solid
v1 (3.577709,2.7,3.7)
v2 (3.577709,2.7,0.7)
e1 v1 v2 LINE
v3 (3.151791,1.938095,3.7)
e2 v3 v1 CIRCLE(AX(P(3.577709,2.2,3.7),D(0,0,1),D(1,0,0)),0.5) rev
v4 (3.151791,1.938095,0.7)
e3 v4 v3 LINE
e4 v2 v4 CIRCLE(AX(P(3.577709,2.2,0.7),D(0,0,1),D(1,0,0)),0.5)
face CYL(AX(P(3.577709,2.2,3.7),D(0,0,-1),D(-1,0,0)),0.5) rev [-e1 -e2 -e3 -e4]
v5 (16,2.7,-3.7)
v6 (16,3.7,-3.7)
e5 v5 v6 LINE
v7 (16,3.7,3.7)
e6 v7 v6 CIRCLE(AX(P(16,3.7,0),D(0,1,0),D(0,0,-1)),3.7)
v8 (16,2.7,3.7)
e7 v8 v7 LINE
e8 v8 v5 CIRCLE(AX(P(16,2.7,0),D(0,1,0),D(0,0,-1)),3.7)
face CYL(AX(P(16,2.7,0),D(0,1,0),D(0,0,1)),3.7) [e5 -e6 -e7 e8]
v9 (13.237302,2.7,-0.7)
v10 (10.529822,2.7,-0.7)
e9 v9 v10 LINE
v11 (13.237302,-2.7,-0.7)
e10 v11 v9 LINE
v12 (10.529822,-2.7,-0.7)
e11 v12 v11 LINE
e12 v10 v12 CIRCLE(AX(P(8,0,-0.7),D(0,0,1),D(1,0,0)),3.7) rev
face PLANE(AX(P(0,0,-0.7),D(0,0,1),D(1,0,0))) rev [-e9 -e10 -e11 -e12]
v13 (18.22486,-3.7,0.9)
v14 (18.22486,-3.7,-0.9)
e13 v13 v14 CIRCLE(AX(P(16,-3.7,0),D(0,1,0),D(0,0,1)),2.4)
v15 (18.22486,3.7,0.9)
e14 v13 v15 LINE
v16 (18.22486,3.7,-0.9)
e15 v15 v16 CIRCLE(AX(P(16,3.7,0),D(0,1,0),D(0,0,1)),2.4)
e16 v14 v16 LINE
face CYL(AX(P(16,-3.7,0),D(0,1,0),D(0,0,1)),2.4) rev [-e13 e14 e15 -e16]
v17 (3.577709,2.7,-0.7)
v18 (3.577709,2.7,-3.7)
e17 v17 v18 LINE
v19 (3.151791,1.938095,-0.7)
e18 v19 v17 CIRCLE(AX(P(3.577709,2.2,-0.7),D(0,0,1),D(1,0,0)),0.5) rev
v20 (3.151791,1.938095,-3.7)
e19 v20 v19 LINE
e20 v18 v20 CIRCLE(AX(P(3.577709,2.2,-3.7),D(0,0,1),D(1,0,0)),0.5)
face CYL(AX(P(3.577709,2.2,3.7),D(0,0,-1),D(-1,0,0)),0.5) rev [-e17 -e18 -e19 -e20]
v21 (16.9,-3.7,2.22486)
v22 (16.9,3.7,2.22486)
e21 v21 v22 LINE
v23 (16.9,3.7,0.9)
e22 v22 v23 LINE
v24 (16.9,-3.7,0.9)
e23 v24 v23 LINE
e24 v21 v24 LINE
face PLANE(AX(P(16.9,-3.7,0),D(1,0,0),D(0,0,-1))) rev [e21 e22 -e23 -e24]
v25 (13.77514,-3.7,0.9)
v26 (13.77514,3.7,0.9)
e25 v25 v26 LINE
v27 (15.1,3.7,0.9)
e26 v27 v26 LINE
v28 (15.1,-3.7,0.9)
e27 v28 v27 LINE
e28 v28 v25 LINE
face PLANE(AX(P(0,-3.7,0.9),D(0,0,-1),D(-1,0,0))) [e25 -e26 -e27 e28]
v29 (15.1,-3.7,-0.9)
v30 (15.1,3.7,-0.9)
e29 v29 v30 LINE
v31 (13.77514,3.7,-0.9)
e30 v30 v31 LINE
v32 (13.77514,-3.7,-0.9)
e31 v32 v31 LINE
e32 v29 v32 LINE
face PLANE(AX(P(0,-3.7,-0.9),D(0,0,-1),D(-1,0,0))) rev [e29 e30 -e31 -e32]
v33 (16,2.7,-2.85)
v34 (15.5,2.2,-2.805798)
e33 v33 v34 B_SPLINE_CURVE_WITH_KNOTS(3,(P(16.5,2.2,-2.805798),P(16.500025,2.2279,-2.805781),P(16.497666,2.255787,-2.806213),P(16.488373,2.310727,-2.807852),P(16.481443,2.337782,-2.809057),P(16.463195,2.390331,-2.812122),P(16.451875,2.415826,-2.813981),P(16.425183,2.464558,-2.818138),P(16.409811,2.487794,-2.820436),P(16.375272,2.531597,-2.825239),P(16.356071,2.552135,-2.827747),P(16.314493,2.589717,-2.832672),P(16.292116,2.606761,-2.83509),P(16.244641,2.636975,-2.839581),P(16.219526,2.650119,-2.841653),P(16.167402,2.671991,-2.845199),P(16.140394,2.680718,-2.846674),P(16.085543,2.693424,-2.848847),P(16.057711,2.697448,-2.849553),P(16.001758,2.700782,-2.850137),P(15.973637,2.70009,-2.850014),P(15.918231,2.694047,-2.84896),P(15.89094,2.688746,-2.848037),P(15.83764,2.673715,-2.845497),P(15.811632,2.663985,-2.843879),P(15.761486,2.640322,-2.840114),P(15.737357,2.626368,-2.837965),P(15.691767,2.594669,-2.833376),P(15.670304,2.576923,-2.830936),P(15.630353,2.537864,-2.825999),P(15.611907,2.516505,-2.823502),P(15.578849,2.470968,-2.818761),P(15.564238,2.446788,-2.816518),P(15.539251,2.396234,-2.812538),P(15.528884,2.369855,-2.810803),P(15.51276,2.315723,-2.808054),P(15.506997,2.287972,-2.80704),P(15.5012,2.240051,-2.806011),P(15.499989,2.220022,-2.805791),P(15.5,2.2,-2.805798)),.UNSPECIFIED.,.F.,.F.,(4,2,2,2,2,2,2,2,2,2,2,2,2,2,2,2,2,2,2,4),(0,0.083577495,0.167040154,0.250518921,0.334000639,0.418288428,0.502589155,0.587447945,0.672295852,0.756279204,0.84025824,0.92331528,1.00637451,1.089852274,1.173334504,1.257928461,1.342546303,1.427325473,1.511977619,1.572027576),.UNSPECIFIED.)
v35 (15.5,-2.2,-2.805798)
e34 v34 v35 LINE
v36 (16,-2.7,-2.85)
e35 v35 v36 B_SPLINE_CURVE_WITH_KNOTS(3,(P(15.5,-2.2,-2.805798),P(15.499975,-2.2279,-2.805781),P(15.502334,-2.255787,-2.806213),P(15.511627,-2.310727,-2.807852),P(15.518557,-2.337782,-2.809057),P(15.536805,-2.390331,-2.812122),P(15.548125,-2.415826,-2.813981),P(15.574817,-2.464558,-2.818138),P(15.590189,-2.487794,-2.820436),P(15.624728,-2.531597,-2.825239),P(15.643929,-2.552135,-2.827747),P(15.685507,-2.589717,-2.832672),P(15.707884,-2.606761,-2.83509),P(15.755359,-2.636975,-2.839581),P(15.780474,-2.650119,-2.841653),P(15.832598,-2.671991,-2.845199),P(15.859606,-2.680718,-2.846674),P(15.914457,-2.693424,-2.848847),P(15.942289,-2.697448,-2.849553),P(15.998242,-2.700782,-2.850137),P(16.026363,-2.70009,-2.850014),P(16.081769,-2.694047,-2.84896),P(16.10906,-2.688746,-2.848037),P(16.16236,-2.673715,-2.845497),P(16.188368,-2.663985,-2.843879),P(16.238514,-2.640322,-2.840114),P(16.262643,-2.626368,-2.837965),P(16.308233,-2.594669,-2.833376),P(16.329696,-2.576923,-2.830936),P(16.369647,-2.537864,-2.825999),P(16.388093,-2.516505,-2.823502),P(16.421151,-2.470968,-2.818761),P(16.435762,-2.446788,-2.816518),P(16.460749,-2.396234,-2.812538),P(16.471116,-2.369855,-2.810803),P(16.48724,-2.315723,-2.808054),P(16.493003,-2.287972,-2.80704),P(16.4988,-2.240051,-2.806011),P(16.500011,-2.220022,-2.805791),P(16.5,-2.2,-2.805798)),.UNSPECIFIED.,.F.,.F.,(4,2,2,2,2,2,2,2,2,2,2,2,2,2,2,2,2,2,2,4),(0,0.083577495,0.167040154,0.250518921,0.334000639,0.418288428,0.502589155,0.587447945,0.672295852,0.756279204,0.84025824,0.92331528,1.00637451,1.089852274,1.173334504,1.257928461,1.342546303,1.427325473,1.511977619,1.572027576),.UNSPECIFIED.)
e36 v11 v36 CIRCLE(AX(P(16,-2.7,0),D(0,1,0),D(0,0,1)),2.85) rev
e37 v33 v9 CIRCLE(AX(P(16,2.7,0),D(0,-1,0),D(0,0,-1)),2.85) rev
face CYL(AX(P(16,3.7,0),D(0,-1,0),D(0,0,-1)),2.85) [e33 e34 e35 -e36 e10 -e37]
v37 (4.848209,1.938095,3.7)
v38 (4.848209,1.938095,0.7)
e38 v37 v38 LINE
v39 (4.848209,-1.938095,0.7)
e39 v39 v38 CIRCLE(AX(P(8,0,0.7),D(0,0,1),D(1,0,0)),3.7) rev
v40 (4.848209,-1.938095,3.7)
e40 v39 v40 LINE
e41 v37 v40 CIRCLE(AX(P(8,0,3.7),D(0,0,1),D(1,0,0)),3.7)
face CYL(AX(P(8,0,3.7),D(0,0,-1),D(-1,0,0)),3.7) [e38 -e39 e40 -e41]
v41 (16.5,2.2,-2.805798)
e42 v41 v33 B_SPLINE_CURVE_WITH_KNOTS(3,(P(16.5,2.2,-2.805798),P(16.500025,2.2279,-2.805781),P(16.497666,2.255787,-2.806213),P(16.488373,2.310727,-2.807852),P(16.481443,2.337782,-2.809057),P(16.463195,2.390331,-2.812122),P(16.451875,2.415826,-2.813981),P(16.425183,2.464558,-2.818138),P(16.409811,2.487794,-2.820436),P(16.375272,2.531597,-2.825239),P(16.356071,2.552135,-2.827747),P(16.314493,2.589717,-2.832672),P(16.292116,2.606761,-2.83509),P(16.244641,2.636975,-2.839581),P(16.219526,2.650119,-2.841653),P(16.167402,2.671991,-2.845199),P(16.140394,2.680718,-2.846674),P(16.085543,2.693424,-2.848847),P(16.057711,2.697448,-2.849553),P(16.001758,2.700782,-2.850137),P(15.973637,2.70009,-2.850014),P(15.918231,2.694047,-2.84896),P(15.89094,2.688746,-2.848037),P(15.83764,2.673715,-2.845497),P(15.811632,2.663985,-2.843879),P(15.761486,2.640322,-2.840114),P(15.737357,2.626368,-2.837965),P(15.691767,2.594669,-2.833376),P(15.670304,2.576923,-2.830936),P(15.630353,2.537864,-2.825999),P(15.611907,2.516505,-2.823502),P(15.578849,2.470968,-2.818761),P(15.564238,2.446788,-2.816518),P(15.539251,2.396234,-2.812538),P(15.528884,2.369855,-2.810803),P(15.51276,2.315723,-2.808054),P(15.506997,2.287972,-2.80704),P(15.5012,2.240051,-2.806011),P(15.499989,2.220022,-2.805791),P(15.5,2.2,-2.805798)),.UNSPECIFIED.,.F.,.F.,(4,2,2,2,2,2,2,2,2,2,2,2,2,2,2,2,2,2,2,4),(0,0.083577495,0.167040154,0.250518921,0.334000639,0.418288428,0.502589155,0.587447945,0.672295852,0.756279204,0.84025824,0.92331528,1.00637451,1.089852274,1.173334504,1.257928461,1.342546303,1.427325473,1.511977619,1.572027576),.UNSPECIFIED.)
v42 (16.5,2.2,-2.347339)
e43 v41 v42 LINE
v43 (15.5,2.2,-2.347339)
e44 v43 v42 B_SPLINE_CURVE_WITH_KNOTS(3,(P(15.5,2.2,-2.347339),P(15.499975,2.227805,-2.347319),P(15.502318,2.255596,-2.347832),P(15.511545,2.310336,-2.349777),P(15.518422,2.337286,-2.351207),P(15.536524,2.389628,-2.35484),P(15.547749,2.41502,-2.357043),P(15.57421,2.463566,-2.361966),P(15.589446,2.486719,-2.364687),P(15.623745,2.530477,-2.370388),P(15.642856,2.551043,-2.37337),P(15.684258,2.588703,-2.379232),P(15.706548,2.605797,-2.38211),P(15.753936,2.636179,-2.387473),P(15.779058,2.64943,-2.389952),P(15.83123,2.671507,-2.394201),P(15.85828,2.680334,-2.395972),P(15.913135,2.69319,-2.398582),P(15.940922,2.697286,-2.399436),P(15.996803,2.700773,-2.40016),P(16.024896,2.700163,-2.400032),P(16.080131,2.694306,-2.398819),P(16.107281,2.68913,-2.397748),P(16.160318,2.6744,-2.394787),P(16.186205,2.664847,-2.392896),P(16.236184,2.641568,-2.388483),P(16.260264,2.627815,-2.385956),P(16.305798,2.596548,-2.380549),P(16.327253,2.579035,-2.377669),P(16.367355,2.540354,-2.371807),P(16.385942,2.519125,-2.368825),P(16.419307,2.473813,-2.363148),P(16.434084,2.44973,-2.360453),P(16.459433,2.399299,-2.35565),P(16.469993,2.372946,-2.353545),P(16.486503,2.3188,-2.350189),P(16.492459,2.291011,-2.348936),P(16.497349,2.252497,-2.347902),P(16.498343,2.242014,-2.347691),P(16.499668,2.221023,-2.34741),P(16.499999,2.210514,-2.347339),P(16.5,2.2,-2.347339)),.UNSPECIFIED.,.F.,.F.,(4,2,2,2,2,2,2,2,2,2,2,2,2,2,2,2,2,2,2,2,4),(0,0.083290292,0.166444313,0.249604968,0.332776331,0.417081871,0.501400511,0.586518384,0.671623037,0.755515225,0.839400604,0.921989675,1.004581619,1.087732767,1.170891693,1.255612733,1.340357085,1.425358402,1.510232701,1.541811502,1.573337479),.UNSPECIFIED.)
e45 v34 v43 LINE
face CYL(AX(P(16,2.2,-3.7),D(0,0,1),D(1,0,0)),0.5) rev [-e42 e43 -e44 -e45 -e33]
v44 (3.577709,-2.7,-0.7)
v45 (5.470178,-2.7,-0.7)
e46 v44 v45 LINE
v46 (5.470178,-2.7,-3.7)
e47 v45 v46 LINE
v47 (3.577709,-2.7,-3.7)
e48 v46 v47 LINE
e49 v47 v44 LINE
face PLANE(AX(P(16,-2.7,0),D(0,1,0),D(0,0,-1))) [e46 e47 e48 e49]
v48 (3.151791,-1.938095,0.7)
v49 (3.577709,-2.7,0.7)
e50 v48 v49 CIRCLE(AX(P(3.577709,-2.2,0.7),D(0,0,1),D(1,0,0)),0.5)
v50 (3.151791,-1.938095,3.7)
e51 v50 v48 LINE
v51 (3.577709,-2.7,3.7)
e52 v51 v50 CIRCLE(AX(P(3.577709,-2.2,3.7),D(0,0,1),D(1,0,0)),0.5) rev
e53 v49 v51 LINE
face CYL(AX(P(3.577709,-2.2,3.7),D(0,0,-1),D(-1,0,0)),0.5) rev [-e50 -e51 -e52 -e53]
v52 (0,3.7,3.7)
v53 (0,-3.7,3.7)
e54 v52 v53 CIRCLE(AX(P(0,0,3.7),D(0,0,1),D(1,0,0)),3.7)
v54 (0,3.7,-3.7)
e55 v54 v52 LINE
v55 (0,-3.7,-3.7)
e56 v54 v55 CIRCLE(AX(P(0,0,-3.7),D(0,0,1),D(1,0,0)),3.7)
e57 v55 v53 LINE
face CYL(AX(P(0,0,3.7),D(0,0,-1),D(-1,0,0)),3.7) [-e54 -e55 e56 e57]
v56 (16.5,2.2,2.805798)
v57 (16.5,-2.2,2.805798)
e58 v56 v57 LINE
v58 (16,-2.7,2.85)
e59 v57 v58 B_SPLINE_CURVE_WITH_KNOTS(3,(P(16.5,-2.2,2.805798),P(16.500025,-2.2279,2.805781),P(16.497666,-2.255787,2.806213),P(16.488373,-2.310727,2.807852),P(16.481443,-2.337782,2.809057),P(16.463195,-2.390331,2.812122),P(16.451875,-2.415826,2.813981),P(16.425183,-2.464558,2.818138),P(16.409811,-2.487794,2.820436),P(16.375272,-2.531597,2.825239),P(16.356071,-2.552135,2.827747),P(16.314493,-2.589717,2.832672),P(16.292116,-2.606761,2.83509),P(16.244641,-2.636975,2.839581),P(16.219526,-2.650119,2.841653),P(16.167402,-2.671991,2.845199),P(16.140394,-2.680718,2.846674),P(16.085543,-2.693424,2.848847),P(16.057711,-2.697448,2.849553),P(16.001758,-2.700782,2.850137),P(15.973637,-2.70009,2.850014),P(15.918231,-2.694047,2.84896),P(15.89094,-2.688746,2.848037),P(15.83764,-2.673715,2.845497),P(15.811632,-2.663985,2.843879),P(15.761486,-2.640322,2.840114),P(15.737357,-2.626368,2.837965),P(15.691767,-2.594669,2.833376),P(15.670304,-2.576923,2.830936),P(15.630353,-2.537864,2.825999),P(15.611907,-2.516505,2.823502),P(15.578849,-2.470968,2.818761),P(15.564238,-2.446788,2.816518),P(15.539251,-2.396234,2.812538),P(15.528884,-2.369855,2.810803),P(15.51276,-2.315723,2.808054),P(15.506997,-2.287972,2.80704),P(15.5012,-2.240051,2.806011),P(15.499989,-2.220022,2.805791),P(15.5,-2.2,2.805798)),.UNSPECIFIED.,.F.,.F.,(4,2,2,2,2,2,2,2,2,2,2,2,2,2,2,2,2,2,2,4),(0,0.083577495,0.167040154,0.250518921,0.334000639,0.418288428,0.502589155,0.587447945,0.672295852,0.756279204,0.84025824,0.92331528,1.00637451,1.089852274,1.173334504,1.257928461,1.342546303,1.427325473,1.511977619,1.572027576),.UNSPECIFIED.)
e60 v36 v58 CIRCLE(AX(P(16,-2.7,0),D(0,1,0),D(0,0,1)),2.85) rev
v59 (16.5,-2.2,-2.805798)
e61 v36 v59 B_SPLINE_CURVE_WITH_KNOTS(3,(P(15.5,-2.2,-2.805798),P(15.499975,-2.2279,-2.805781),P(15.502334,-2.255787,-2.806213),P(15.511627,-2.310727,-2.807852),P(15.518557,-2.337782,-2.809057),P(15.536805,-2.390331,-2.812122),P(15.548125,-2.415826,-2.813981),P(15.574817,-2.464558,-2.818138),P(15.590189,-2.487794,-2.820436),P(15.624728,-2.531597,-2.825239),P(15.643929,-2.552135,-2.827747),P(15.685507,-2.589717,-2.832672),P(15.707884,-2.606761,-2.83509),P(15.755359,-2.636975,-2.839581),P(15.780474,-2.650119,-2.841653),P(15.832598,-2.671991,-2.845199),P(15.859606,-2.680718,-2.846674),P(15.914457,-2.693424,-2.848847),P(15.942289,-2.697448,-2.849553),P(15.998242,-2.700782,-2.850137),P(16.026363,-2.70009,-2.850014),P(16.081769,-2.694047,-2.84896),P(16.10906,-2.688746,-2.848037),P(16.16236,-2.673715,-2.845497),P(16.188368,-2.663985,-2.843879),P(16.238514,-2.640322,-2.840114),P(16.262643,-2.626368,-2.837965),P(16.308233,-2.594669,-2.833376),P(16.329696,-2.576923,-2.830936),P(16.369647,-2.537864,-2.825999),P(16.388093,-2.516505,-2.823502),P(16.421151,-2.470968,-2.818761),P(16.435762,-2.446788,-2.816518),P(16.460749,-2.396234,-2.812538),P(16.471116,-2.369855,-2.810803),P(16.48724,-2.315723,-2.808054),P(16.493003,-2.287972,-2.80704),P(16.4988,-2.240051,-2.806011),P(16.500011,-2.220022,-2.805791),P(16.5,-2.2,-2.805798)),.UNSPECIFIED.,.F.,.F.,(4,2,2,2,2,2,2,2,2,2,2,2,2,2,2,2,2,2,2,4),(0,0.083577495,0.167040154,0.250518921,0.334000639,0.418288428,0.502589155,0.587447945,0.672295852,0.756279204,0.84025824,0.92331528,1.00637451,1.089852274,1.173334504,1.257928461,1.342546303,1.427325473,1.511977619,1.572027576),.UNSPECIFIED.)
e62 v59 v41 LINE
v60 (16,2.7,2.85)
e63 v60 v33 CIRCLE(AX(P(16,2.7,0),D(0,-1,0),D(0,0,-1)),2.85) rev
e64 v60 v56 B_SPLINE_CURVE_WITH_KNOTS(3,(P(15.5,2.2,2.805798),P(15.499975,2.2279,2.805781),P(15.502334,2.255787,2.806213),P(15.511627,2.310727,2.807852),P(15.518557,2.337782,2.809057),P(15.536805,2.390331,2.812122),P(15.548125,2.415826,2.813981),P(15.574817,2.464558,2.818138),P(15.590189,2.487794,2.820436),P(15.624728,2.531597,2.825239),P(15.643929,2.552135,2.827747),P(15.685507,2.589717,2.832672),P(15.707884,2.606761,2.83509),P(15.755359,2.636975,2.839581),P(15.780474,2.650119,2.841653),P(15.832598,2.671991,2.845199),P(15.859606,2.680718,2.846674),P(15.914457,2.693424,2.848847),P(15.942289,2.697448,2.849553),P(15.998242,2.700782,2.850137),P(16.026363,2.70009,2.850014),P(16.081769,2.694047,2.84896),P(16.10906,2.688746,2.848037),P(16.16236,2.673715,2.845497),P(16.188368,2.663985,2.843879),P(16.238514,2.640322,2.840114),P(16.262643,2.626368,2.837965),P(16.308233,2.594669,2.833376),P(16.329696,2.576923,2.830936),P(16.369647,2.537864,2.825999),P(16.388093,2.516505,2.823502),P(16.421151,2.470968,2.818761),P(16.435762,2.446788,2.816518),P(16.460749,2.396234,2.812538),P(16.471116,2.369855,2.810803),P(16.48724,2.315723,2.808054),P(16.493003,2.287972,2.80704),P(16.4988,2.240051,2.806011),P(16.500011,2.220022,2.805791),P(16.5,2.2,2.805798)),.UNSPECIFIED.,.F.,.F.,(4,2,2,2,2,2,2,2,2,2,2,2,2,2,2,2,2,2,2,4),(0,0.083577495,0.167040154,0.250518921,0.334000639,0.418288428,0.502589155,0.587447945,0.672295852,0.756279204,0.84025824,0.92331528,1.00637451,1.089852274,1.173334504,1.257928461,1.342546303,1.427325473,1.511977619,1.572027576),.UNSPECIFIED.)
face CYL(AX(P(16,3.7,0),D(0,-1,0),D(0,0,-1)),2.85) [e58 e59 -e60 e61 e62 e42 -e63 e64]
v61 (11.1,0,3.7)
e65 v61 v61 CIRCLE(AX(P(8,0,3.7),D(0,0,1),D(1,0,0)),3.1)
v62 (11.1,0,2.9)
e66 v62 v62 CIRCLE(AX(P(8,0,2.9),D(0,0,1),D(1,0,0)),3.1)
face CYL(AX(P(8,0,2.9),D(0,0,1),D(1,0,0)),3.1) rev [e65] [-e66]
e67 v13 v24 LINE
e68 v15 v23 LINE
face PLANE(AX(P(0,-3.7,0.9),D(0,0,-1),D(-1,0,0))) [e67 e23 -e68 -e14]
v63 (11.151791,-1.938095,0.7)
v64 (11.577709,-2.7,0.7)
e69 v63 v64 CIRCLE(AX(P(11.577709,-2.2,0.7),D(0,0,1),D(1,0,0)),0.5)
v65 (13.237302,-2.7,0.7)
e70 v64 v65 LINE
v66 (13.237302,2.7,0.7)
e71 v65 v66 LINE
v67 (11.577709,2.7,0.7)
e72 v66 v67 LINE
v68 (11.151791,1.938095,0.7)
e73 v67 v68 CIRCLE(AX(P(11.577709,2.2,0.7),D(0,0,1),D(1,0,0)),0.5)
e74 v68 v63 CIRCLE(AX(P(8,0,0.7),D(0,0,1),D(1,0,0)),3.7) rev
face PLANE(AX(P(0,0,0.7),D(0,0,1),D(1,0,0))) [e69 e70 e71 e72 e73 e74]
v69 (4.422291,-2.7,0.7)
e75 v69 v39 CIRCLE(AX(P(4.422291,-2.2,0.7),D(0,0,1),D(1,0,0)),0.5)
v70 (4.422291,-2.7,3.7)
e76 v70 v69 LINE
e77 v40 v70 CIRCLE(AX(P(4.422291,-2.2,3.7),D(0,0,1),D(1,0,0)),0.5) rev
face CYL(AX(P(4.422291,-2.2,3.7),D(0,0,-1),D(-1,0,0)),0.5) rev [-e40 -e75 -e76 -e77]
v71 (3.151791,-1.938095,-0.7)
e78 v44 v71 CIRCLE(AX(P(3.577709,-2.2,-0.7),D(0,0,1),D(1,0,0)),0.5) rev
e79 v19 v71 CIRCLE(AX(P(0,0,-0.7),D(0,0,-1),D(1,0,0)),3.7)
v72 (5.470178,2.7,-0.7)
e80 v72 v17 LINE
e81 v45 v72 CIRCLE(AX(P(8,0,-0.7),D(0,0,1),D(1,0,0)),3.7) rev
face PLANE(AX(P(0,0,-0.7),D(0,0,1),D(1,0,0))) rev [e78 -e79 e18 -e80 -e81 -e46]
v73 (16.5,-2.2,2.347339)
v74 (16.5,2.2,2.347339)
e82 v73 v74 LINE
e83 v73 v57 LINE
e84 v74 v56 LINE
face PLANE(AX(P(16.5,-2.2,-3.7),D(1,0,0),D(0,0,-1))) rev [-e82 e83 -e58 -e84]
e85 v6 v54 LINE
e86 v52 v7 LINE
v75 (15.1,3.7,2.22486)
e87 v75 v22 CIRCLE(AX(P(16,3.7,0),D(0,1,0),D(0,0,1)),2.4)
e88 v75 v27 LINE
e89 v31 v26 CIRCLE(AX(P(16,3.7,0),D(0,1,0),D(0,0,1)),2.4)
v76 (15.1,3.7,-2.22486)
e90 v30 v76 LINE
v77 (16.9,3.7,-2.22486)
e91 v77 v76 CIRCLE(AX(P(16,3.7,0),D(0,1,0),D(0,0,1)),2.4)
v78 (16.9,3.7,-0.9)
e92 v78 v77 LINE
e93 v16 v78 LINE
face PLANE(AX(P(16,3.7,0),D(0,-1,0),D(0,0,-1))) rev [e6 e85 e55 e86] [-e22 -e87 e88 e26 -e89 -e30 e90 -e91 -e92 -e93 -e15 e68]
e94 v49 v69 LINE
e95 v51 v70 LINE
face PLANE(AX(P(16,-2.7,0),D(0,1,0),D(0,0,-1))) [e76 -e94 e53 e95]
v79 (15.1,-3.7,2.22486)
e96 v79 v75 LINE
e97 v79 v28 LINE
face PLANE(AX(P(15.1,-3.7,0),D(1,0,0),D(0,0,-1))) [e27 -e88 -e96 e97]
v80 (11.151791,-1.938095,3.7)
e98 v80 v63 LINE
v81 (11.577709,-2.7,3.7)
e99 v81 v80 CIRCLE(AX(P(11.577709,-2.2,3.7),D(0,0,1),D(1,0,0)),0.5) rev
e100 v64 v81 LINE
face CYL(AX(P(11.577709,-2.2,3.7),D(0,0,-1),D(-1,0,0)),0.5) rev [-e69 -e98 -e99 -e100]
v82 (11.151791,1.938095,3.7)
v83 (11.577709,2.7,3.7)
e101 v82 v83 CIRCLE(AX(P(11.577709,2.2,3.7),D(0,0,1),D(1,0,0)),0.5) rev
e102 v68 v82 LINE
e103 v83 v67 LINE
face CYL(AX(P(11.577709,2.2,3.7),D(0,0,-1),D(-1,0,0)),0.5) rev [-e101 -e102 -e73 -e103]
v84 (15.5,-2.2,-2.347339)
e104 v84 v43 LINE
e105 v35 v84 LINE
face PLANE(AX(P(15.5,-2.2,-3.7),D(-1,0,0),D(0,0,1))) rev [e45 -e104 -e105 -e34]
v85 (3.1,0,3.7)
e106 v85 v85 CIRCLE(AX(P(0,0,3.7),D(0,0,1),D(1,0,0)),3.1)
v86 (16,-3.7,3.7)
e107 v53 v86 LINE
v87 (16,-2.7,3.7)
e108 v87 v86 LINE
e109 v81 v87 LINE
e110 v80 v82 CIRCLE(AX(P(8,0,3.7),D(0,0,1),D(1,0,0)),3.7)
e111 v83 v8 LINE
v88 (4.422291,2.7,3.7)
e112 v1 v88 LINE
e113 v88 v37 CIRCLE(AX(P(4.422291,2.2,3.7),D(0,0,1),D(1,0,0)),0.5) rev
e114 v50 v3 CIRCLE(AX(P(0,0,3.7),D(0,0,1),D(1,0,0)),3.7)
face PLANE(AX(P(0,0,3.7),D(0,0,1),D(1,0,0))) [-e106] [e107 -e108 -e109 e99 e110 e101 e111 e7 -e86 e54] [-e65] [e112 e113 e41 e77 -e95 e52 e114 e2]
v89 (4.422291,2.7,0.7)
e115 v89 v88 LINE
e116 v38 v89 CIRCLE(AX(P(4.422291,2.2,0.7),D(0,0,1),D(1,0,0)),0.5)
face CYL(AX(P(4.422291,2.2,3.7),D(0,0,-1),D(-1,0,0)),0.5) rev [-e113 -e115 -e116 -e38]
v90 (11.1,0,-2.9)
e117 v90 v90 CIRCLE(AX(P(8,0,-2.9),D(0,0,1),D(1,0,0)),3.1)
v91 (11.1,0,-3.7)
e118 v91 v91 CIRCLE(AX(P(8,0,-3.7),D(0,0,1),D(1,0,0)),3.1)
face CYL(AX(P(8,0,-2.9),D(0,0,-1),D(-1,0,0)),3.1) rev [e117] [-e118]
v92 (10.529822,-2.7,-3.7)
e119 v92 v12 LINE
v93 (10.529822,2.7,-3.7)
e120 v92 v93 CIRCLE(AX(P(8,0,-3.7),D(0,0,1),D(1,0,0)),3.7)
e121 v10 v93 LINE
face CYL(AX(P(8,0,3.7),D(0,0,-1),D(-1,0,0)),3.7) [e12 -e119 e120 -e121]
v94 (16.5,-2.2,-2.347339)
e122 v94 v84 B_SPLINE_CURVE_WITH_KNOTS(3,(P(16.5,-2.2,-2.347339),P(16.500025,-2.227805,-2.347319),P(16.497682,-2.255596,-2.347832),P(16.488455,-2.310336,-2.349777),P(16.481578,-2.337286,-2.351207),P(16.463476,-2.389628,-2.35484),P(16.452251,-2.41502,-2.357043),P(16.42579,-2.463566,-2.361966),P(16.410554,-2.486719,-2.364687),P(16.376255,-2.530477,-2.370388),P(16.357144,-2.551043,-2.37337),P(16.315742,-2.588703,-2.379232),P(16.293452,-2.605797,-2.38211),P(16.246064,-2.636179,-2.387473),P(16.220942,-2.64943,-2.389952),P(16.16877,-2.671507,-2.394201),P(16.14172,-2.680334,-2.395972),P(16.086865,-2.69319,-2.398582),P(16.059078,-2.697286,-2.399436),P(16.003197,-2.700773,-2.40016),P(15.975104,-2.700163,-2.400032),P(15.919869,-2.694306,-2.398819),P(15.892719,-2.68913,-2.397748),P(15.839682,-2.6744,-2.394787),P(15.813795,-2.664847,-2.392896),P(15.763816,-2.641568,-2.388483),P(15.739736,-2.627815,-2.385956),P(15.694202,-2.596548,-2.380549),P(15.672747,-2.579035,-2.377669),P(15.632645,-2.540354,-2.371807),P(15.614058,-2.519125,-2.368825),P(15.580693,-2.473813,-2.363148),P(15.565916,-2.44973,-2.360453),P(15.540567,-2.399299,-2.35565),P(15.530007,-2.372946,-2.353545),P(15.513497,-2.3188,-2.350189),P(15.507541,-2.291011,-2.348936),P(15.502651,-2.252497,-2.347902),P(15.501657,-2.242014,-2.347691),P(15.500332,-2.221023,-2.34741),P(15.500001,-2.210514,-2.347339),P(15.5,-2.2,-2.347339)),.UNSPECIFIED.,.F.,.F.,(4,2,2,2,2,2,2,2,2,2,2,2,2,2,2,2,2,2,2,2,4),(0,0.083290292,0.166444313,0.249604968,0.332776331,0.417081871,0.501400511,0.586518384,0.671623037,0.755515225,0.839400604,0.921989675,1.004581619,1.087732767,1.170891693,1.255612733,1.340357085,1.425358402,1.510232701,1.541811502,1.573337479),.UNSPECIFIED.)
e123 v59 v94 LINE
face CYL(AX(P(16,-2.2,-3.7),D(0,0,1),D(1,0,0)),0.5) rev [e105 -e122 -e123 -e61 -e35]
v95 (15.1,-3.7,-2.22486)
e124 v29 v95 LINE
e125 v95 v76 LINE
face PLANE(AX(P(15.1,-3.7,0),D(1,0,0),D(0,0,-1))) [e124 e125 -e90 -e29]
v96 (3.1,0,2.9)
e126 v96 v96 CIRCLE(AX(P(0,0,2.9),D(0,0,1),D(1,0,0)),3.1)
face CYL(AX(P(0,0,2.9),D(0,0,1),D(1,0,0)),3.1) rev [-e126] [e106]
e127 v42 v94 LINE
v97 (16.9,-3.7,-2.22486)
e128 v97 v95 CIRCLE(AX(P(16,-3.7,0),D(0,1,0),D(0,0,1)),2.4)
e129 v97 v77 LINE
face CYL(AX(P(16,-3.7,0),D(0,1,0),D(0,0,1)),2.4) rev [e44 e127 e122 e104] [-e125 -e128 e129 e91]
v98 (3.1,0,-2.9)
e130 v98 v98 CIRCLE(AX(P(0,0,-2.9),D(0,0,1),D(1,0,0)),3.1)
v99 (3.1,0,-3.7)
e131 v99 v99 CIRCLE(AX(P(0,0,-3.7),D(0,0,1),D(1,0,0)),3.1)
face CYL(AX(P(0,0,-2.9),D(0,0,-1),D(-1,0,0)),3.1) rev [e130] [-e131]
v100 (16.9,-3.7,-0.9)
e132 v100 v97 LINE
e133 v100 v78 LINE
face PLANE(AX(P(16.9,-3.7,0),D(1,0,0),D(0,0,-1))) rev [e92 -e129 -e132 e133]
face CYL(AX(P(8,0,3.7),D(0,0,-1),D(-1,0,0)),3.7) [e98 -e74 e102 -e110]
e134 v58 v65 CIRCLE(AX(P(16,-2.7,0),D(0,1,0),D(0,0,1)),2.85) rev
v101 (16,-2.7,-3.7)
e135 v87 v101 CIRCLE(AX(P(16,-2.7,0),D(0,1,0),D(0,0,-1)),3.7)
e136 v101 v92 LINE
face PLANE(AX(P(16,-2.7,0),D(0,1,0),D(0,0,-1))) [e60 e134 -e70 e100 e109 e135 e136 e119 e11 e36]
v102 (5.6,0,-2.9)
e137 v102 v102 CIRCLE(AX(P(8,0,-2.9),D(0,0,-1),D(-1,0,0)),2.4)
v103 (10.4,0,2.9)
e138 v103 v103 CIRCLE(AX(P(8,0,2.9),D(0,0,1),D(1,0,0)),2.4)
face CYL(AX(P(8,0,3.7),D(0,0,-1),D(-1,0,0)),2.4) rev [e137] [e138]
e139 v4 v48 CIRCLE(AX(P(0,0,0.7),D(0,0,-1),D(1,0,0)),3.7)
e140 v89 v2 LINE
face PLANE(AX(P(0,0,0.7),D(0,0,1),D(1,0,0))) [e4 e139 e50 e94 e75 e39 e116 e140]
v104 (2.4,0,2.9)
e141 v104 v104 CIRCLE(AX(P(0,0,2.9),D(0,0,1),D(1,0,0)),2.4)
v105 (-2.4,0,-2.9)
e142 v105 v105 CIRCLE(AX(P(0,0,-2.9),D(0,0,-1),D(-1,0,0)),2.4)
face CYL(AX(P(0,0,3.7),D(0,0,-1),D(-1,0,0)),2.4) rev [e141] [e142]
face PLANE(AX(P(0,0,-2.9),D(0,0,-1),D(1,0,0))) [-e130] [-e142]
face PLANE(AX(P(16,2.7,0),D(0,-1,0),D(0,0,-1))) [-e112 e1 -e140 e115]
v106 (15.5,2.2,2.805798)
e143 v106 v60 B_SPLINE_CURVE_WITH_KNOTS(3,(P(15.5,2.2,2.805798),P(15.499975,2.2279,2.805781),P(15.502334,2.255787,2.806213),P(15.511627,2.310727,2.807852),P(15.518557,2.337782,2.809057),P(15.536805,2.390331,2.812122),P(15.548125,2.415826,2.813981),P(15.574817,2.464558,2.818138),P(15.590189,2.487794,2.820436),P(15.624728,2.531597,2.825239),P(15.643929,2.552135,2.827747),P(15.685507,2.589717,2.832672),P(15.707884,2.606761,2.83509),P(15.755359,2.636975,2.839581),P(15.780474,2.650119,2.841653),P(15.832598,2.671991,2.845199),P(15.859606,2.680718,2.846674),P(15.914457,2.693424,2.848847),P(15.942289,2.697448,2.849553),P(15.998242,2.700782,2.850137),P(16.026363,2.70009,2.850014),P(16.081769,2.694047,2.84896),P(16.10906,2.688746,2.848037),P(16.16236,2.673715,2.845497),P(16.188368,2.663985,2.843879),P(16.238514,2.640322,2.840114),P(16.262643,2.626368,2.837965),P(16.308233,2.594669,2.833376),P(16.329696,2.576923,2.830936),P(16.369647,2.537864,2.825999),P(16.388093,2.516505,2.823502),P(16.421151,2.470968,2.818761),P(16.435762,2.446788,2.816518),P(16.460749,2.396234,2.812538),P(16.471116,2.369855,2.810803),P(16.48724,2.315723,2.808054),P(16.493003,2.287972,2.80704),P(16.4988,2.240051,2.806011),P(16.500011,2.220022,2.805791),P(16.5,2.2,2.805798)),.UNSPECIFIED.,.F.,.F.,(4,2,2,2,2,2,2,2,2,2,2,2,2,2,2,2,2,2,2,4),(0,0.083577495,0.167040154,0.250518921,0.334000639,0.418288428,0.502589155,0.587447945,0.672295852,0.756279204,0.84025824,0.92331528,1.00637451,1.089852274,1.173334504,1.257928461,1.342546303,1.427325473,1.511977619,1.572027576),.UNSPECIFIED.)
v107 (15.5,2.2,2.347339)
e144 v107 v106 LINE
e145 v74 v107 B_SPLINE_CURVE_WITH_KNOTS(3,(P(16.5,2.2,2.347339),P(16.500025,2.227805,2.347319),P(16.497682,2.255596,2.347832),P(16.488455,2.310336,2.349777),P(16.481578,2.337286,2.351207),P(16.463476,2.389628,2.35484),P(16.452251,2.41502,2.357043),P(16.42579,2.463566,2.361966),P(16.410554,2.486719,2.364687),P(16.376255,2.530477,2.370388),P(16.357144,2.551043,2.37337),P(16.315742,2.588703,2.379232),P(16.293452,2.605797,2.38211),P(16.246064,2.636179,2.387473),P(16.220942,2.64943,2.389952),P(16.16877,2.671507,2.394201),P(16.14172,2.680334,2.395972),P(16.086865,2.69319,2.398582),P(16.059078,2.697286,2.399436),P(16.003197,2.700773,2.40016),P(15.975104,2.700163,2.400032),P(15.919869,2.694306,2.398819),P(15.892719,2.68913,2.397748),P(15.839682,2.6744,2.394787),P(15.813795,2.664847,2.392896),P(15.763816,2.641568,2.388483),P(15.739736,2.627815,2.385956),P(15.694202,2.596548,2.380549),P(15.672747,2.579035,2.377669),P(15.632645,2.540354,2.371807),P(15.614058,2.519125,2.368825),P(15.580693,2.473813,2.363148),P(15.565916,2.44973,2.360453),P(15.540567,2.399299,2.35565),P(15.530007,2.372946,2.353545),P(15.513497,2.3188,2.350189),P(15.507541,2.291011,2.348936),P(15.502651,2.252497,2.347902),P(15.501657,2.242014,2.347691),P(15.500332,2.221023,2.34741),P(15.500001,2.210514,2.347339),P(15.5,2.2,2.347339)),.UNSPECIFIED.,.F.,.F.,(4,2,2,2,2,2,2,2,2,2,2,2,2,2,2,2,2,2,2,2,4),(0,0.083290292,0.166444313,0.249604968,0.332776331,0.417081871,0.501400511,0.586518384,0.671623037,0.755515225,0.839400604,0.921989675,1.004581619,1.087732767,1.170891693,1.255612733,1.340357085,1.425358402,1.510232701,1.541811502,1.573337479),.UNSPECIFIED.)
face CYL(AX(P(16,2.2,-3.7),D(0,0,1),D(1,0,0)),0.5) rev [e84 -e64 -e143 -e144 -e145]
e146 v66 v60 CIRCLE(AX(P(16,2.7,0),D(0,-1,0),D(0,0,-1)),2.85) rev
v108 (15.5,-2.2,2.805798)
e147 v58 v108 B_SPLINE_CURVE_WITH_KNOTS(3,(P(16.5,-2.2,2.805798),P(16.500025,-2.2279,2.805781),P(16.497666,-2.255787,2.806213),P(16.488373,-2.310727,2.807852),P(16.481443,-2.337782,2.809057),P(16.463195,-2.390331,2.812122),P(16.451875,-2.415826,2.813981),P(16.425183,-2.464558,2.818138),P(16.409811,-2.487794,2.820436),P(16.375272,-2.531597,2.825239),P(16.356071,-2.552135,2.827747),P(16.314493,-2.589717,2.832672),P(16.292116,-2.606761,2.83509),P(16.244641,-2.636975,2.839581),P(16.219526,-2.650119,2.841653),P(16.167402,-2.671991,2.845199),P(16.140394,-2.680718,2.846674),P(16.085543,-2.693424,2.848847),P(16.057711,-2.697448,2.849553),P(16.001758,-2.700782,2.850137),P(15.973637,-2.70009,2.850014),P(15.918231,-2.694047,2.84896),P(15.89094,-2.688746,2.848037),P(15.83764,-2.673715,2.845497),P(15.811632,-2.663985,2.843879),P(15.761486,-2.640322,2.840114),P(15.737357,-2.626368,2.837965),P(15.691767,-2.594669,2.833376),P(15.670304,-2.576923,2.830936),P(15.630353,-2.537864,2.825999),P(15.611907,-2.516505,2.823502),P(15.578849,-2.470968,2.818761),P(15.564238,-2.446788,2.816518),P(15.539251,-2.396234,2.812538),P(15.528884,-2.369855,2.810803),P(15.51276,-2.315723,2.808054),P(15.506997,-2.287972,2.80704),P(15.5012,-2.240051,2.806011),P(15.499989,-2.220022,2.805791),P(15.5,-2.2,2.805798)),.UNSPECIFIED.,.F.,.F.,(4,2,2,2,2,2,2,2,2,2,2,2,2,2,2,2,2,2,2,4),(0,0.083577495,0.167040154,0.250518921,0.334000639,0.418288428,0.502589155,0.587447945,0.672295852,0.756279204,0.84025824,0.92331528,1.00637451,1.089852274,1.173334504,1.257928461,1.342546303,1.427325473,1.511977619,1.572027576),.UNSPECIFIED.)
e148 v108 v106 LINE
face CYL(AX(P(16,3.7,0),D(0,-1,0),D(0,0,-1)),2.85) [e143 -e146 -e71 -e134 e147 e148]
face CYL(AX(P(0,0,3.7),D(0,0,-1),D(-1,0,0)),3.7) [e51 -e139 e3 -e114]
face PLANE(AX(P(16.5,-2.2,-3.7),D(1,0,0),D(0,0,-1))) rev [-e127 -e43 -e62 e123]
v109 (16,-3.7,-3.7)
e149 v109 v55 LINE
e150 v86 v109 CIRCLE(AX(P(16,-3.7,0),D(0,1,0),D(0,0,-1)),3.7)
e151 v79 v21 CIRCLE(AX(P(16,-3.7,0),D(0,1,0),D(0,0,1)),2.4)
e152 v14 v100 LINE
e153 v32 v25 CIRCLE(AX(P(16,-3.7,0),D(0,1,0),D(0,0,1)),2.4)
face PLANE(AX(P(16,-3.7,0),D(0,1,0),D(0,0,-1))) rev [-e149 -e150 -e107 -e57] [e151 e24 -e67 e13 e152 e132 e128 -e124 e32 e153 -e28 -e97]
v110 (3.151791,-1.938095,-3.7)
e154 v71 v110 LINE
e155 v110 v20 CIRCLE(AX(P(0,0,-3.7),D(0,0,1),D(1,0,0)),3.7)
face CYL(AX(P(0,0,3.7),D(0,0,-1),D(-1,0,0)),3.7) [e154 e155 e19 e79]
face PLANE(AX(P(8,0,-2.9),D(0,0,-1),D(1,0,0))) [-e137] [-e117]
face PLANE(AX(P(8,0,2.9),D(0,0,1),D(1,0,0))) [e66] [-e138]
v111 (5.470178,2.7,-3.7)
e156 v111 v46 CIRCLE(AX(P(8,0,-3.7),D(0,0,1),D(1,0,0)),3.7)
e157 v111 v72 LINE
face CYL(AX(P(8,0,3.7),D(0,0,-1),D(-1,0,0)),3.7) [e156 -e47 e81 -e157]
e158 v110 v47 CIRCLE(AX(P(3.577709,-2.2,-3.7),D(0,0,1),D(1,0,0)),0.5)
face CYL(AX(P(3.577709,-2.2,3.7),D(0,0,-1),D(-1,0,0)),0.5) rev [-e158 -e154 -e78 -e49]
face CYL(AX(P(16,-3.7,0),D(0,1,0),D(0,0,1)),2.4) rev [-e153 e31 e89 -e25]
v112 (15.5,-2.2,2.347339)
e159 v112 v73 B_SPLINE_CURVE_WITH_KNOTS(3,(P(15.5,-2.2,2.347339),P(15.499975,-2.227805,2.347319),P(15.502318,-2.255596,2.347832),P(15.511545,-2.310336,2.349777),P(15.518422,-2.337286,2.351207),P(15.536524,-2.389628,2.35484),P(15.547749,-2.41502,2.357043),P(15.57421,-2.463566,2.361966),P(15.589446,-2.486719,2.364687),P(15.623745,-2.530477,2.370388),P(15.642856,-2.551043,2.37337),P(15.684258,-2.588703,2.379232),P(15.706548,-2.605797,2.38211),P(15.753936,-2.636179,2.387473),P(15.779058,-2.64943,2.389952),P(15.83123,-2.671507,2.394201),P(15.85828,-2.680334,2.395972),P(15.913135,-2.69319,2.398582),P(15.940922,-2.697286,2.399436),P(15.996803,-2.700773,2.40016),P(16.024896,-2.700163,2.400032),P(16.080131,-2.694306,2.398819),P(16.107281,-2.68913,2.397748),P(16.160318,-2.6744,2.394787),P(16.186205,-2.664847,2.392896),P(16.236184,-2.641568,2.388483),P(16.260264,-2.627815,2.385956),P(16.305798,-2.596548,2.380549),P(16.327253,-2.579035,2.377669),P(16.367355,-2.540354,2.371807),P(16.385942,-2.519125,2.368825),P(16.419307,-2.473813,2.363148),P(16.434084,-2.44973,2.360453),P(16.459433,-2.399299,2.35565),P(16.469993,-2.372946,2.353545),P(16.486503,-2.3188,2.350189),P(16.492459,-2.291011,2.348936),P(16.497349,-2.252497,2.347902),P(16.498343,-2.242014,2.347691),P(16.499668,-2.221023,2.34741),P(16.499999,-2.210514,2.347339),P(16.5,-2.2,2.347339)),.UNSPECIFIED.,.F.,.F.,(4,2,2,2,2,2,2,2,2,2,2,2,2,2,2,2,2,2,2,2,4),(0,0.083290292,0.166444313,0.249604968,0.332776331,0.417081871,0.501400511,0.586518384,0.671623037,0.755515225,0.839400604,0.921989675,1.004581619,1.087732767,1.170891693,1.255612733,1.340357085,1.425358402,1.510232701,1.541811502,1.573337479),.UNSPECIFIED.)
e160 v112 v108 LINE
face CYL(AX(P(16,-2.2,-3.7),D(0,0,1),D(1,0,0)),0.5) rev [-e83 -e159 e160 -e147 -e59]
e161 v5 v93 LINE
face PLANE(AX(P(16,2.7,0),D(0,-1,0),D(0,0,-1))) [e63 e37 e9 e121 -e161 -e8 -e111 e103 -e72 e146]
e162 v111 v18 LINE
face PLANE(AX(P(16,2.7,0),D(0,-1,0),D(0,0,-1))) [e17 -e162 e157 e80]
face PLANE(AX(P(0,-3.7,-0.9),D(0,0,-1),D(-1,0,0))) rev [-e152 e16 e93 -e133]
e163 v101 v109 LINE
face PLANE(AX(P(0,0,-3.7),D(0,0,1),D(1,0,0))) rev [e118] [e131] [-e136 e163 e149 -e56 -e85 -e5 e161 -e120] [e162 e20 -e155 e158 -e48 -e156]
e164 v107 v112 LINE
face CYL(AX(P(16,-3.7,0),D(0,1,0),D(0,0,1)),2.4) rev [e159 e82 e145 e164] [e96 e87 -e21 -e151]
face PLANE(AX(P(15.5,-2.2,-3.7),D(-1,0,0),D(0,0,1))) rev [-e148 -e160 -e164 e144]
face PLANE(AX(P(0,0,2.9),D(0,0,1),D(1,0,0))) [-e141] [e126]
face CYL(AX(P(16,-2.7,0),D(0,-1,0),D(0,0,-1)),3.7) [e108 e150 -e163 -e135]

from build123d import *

# Parameters (mm, degrees)
SKETCH1_R                  = 3.7
SKETCH1_R_2                = 2.4
PIN_SIDE_DEPTH             = 3.7
SIDE_START                 = 3.7
SIDE_EAR_DEPTH             = 1
MIDDLE_RIB_DEPTH           = 0.7
SKETCH4_R                  = 2.85
AXLE_BODY_DEPTH            = 3.7
AXLE_CUT_DEPTH             = 21.383081219
AXLE_CUT_DEPTH_BACK        = 21.383081219
SKETCH5_W                  = 1.8
SKETCH5_H                  = 1.8
AXLE_SLOT_DEPTH            = 21.383081219
AXLE_SLOT_DEPTH_BACK       = 21.383081219
SKETCH8_R                  = 3.7
SKETCH8_R_2                = 2.4
SECOND_PIN_BODY_DEPTH      = 3.7
SECOND_PIN_HOLE_DEPTH      = 21.383081238
SECOND_PIN_HOLE_DEPTH_BACK = 21.383081238
SKETCH9_R                  = 2.4
SKETCH7_R                  = 3.1
PIN_RIM_DEPTH              = 0.8
FILLET1_R                  = 0.5
MIRROR2_START              = -3.7
MIRROR2_OUTLINE_R          = 3.1
MIRROR2_OUTLINE_R_2        = 2.4
MIRROR2_DEPTH              = 0.8
MIRROR2_2_DEPTH            = 3
MIRROR2_START_2            = 0.7
MIRROR2_3_DEPTH            = 3


# Read off the part's stored shape, not the designer's step: Mirror2
with BuildPart() as part:
    # Sketch1 → Pin Side (new, symmetric)
    with BuildSketch(Plane.XY):
        Circle(SKETCH1_R)
        Circle(SKETCH1_R_2, mode=Mode.SUBTRACT)
    extrude(amount=PIN_SIDE_DEPTH, both=True)

    # Sketch2 → Side Ear (add)
    with BuildSketch(Plane(origin=(0, 0, 0), x_dir=(1, 0, 0), z_dir=(0, 1, 0)).offset(SIDE_START)):
        with BuildLine():
            Line((0, 3.7), (0, -3.7))
            Line((0, -3.7), (16, -3.7))
            ThreePointArc((16, -3.7), (19.7, 0), (16, 3.7))
            Line((16, 3.7), (0, 3.7))
        make_face()
    side_ear = extrude(amount=-SIDE_EAR_DEPTH)

    # Mirror1: Side Ear across plane
    add(side_ear.mirror(Plane.ZX))

    # Sketch3 → Middle Rib (add, symmetric)
    with BuildSketch(Plane.XY):
        with BuildLine():
            Line((2.529822128, -2.7), (16, -2.7))
            Line((16, -2.7), (16, 2.7))
            Line((16, 2.7), (2.529822128, 2.7))
            ThreePointArc((2.529822128, 2.7), (3.7, 0), (2.529822128, -2.7))
        make_face()
    extrude(amount=MIDDLE_RIB_DEPTH, both=True)

    # Sketch4 → Axle Body (add, symmetric)
    with BuildSketch(Plane(origin=(0, 0, 0), x_dir=(1, 0, 0), z_dir=(0, 1, 0))):
        with Locations((16, 0)):
            Circle(SKETCH4_R)
    extrude(amount=AXLE_BODY_DEPTH, both=True)

    # Sketch5 → Axle Cut (cut, two sides: drawn at the far end of the back side and taken through both)
    with BuildSketch(Plane(origin=(0, 0, 0), x_dir=(1, 0, 0), z_dir=(0, 1, 0)).offset(-AXLE_CUT_DEPTH_BACK)):
        with BuildLine():
            Line((13.775140454, -0.9), (15.1, -0.9))
            Line((15.1, -0.9), (15.1, 0.9))
            Line((15.1, 0.9), (13.775140454, 0.9))
            ThreePointArc((13.775140454, 0.9), (13.644191974, 0.45844143), (13.6, 0))
            ThreePointArc((13.6, 0), (13.644191974, -0.45844143), (13.775140454, -0.9))
        make_face()
        with BuildLine():
            Line((15.1, 0.9), (16.9, 0.9))
            Line((16.9, 0.9), (16.9, 2.224859546))
            ThreePointArc((16.9, 2.224859546), (16.45844143, 2.355808026), (16, 2.4))
            ThreePointArc((16, 2.4), (15.54155857, 2.355808026), (15.1, 2.224859546))
            Line((15.1, 2.224859546), (15.1, 0.9))
        make_face()
        with Locations((16, 0)):
            Rectangle(SKETCH5_W, SKETCH5_H)
        with BuildLine():
            Line((16.9, 0.9), (16.9, -0.9))
            Line((16.9, -0.9), (18.224859546, -0.9))
            ThreePointArc((18.224859546, -0.9), (18.355808026, -0.45844143), (18.4, 0))
            ThreePointArc((18.4, 0), (18.355808026, 0.45844143), (18.224859546, 0.9))
            Line((18.224859546, 0.9), (16.9, 0.9))
        make_face()
        with BuildLine():
            ThreePointArc((15.1, -2.224859546), (15.54155857, -2.355808026), (16, -2.4))
            ThreePointArc((16, -2.4), (16.45844143, -2.355808026), (16.9, -2.224859546))
            Line((16.9, -2.224859546), (16.9, -0.9))
            Line((16.9, -0.9), (15.1, -0.9))
            Line((15.1, -0.9), (15.1, -2.224859546))
        make_face()
    extrude(amount=AXLE_CUT_DEPTH + AXLE_CUT_DEPTH_BACK, mode=Mode.SUBTRACT)

    # Sketch6 → Axle Slot (cut, two sides: drawn at the far end of the back side and taken through both)
    with BuildSketch(Plane.XY.offset(-AXLE_SLOT_DEPTH_BACK)):
        with BuildLine():
            Line((15.5, -2.2), (15.5, 2.2))
            ThreePointArc((15.5, 2.2), (16, 2.7), (16.5, 2.2))
            Line((16.5, 2.2), (16.5, -2.2))
            ThreePointArc((16.5, -2.2), (16, -2.7), (15.5, -2.2))
        make_face()
    extrude(amount=AXLE_SLOT_DEPTH + AXLE_SLOT_DEPTH_BACK, mode=Mode.SUBTRACT)

    # Sketch8 → Second Pin Body (add, symmetric)
    with BuildSketch(Plane.XY):
        with Locations((8, 0)):
            Circle(SKETCH8_R)
        with Locations((8, 0)):
            Circle(SKETCH8_R_2, mode=Mode.SUBTRACT)
    extrude(amount=SECOND_PIN_BODY_DEPTH, both=True)

    # Sketch9 → Second Pin Hole (cut, two sides: drawn at the far end of the back side and taken through both)
    with BuildSketch(Plane.XY.offset(-SECOND_PIN_HOLE_DEPTH_BACK)):
        with Locations((8, 0)):
            Circle(SKETCH9_R)
    extrude(amount=SECOND_PIN_HOLE_DEPTH + SECOND_PIN_HOLE_DEPTH_BACK, mode=Mode.SUBTRACT)

    # Sketch7 → Pin Rim (cut)
    with BuildSketch(Plane.XY.offset(3.7)):
        Circle(SKETCH7_R)
        with Locations((8, 0)):
            Circle(SKETCH7_R)
    extrude(amount=-PIN_RIM_DEPTH, mode=Mode.SUBTRACT)

    # Fillet1
    fillet1_edges = [part.edges().sort_by_distance(p)[0] for p in [
        (5.470177872, -2.7, 2.2),
        (5.470177872, 2.7, 2.2),
        (2.529822128, -2.7, 2.2),
        (2.529822128, 2.7, 2.2),
    ]]
    fillet(fillet1_edges, radius=FILLET1_R)

    # Mirror2 outline → Mirror2 (cut)
    # profile 1 of 2: a face of its own
    with BuildSketch(Plane.XY.offset(MIRROR2_START)):
        with Locations((8, 0)):
            Circle(MIRROR2_OUTLINE_R)
        with Locations((8, 0)):
            Circle(MIRROR2_OUTLINE_R_2, mode=Mode.SUBTRACT)
    # profile 2 of 2: a face of its own
    with BuildSketch(Plane.XY.offset(MIRROR2_START)):
        Circle(MIRROR2_OUTLINE_R)
        Circle(MIRROR2_OUTLINE_R_2, mode=Mode.SUBTRACT)
    extrude(amount=MIRROR2_DEPTH, mode=Mode.SUBTRACT)

    # Mirror2 2 outline → Mirror2 2 (add)
    with BuildSketch(Plane.XY.offset(MIRROR2_START)):
        with BuildLine():
            ThreePointArc((2.529822128, 2.7), (2.86623565, 2.33980623), (3.151791054, 1.938095238))
            ThreePointArc((3.151791054, 1.938095238), (3.141272984, 2.443975018), (3.577708764, 2.7))
            Line((3.577708764, 2.7), (2.529822128, 2.7))
        make_face()
        with BuildLine():
            ThreePointArc((3.577708764, -2.7), (3.141272984, -2.443975018), (3.151791054, -1.938095238))
            ThreePointArc((3.151791054, -1.938095238), (2.86623565, -2.33980623), (2.529822128, -2.7))
            Line((2.529822128, -2.7), (3.577708764, -2.7))
        make_face()
    extrude(amount=MIRROR2_2_DEPTH)

    # Mirror2 3 outline → Mirror2 3 (add)
    with BuildSketch(Plane.XY.offset(MIRROR2_START_2)):
        with BuildLine():
            ThreePointArc((10.529822128, 2.7), (10.86623565, 2.33980623), (11.151791054, 1.938095238))
            ThreePointArc((11.151791054, 1.938095238), (11.141272984, 2.443975018), (11.577708764, 2.7))
            Line((11.577708764, 2.7), (10.529822128, 2.7))
        make_face()
        with BuildLine():
            ThreePointArc((11.577708764, -2.7), (11.141272984, -2.443975018), (11.151791054, -1.938095238))
            ThreePointArc((11.151791054, -1.938095238), (10.86623565, -2.33980623), (10.529822128, -2.7))
            Line((10.529822128, -2.7), (11.577708764, -2.7))
        make_face()
    extrude(amount=MIRROR2_3_DEPTH)


solid = part.part
